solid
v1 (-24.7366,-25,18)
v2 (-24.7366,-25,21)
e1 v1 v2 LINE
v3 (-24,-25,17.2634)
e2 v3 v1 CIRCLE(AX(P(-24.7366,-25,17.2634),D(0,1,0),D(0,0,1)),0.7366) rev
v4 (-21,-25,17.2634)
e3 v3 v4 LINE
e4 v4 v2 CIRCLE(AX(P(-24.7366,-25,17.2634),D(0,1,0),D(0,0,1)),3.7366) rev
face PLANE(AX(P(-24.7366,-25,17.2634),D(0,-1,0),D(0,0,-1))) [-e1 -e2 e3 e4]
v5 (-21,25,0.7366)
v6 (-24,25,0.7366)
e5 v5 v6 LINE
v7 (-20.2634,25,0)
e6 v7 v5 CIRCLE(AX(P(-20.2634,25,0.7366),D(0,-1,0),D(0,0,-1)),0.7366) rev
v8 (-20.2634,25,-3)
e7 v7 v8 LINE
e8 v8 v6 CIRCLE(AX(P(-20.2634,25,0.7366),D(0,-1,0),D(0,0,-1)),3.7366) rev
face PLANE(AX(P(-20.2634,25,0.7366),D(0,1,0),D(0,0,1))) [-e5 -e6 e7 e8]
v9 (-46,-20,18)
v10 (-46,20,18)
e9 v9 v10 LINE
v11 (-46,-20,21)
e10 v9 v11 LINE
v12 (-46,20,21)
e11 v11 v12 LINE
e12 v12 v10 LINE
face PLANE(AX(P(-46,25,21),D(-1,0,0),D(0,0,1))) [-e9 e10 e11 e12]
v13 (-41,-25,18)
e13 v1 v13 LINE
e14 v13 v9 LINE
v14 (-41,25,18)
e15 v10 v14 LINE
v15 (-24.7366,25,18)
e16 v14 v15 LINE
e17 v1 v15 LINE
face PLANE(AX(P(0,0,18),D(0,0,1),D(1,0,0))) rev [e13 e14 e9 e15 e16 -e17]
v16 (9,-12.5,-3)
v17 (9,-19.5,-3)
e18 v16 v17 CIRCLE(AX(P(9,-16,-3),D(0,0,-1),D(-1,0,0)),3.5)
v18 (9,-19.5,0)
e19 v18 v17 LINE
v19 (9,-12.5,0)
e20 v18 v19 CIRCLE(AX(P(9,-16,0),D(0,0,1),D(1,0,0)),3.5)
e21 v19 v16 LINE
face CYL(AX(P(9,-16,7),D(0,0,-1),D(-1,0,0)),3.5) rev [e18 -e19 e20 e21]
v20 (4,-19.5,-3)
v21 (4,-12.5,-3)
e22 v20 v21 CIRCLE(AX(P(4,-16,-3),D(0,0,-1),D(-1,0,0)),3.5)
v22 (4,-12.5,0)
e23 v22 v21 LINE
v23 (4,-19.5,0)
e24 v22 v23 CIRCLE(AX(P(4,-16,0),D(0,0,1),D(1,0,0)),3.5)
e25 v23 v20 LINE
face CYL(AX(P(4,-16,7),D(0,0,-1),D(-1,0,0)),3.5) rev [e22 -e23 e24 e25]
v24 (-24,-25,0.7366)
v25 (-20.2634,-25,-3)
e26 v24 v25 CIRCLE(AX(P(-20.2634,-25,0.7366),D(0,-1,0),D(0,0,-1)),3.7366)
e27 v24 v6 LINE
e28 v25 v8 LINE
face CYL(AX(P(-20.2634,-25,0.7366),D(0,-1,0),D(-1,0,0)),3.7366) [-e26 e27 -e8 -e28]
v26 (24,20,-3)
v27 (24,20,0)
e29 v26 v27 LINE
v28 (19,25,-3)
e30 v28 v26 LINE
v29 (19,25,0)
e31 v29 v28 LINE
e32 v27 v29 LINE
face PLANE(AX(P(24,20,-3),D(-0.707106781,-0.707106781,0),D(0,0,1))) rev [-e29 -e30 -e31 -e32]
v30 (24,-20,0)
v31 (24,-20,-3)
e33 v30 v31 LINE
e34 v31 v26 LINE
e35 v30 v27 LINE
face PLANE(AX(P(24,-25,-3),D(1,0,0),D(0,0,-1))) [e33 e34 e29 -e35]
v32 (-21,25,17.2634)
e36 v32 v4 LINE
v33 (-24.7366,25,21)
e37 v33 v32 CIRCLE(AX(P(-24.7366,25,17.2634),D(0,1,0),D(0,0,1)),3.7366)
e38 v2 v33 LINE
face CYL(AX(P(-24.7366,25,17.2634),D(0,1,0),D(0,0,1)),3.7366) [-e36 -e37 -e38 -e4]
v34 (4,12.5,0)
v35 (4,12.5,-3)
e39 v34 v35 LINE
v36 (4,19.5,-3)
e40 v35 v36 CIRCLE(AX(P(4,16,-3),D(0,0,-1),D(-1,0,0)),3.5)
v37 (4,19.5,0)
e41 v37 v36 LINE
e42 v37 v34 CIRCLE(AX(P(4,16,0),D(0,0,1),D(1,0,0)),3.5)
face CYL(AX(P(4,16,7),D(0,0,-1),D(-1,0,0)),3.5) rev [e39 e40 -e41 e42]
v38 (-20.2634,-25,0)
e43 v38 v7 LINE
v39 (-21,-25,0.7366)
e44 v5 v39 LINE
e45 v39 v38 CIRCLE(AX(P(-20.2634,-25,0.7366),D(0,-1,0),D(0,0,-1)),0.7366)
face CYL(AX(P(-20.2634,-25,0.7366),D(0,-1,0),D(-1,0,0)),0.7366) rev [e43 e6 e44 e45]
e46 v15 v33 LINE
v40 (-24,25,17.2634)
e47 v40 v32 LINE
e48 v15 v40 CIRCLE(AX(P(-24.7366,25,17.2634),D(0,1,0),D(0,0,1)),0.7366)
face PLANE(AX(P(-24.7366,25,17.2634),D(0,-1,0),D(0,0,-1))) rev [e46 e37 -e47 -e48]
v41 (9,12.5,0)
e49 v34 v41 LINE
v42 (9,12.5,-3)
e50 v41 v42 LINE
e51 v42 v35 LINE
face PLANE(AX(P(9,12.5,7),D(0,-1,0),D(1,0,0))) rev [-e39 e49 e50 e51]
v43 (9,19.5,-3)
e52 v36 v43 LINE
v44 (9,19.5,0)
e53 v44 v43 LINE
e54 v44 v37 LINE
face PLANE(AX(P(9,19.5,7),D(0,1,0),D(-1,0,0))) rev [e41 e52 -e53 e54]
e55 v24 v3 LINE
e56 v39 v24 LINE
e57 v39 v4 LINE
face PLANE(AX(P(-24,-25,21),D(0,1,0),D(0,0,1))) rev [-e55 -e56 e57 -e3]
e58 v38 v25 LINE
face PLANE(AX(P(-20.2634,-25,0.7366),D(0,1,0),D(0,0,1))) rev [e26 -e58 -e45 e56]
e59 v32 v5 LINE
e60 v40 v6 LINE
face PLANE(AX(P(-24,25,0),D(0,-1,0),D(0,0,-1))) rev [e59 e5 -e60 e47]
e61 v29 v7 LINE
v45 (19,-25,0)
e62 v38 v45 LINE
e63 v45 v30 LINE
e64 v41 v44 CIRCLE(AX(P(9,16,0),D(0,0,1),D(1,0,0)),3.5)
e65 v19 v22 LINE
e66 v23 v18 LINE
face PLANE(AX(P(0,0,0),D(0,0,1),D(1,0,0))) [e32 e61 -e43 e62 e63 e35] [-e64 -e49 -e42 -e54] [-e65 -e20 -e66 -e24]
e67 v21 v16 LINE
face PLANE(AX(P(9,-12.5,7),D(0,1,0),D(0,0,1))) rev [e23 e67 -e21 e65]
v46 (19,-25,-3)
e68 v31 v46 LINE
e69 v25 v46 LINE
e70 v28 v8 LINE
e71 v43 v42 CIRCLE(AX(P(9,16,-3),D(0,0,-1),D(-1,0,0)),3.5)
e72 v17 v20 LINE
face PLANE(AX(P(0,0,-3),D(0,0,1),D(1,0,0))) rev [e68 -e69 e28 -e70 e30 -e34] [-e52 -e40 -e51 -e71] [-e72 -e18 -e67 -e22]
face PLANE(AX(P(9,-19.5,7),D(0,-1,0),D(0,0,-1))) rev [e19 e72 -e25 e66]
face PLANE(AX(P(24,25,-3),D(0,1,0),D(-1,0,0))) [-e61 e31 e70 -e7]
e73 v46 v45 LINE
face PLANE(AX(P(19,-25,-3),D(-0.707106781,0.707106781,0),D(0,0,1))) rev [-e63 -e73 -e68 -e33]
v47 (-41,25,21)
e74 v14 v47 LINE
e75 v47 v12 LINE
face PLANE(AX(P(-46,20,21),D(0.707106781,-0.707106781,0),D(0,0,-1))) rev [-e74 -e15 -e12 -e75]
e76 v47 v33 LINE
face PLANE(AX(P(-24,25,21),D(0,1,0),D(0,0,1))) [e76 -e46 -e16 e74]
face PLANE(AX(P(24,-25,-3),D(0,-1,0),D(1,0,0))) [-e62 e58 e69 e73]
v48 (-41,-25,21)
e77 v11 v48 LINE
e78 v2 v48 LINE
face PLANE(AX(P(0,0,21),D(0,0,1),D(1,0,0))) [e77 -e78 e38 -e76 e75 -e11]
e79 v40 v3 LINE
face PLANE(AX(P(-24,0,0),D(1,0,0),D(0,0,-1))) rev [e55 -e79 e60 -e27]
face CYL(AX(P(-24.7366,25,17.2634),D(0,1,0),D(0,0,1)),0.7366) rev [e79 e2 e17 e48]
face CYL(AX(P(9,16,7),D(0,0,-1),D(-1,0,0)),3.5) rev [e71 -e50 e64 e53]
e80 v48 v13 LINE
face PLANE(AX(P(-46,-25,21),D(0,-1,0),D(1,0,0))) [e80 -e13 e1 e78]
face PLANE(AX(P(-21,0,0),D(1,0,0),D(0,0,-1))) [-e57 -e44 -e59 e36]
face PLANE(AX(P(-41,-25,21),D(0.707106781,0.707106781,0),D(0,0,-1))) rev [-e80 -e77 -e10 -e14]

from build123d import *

# Parameters (mm, degrees)
SKETCH_1_W                       = 48
SKETCH_1_H                       = 50
SM_BASE_FLANGE_1_DEPTH           = 3
SM_EDGE_FLANGE_1_STRIP_W         = 13.4732
SM_EDGE_FLANGE_1_STRIP_H         = 3
SM_EDGE_FLANGE_1_STRIP_CUT_DEPTH = 50
SM_EDGE_FLANGE_1_DEPTH           = 50
SM_EDGE_FLANGE_2_STRIP_W         = 13.4732
SM_EDGE_FLANGE_2_STRIP_H         = 3
SM_EDGE_FLANGE_2_STRIP_CUT_DEPTH = 50
SM_EDGE_FLANGE_2_DEPTH           = 50
CHAMFER_1_SIZE                   = 5
HOLE_WIZARD_7_0_7_1_D            = 7
CUT_EXTRUDE_1_DEPTH              = 10


# Sheet-metal steps are written as plain solids
with BuildPart() as part:
    # Sketch 1 → 基体-法兰1 (new body)
    with BuildSketch(Plane.XY):
        Rectangle(SKETCH_1_W, SKETCH_1_H)
    extrude(amount=-SM_BASE_FLANGE_1_DEPTH)

    # 边线-法兰1 strip (across the edge) → 边线-法兰1 strip cut (cut)
    with BuildSketch(Plane(origin=(-24, 25, 0), x_dir=(1, 0, 0), z_dir=(0, -1, 0))):
        with Locations((-3, -1.5)):
            Rectangle(SM_EDGE_FLANGE_1_STRIP_W, SM_EDGE_FLANGE_1_STRIP_H)
    extrude(amount=SM_EDGE_FLANGE_1_STRIP_CUT_DEPTH, mode=Mode.SUBTRACT)

    # 边线-法兰1 section (across the edge) → 边线-法兰1 (add)
    with BuildSketch(Plane(origin=(-24, 25, 0), x_dir=(1, 0, 0), z_dir=(0, -1, 0))):
        with BuildLine():
            Line((0, 0.7366), (0, 21))
            Line((0, 21), (3, 21))
            Line((3, 21), (3, 0.7366))
            ThreePointArc((3, 0.7366), (3.215745145, 0.215745145), (3.7366, 0))
            Line((3.7366, 0), (3.7366, -3))
            ThreePointArc((3.7366, -3), (1.094424801, -1.905575199), (0, 0.7366))
        make_face()
    extrude(amount=SM_EDGE_FLANGE_1_DEPTH)

    # 边线-法兰2 strip (across the edge) → 边线-法兰2 strip cut (cut)
    with BuildSketch(Plane(origin=(-24, -25, 21), x_dir=(0, 0, -1), z_dir=(0, 1, 0))):
        with Locations((-3, -1.5)):
            Rectangle(SM_EDGE_FLANGE_2_STRIP_W, SM_EDGE_FLANGE_2_STRIP_H)
    extrude(amount=SM_EDGE_FLANGE_2_STRIP_CUT_DEPTH, mode=Mode.SUBTRACT)

    # 边线-法兰2 section (across the edge) → 边线-法兰2 (add)
    with BuildSketch(Plane(origin=(-24, -25, 21), x_dir=(0, 0, -1), z_dir=(0, 1, 0))):
        with BuildLine():
            Line((0, 0.7366), (0, 22))
            Line((0, 22), (3, 22))
            Line((3, 22), (3, 0.7366))
            ThreePointArc((3, 0.7366), (3.215745145, 0.215745145), (3.7366, 0))
            Line((3.7366, 0), (3.7366, -3))
            ThreePointArc((3.7366, -3), (1.094424801, -1.905575199), (0, 0.7366))
        make_face()
    extrude(amount=SM_EDGE_FLANGE_2_DEPTH)

    # 倒角1
    chamfer_1_edges = [part.edges().sort_by_distance(p)[0] for p in [
        (-46, -25, 19.5),
        (-46, 25, 19.5),
        (24, 25, -1.5),
        (24, -25, -1.5),
    ]]
    chamfer(chamfer_1_edges, length=CHAMFER_1_SIZE)

    # Ø7.0 (7) 直径孔1 (through all)
    with Locations(Plane(origin=(0, 0, -3), x_dir=(-1, 0, 0), z_dir=(0, 0, -1))):
        with Locations((-6.5, 16), (-6.5, -16)):
            Hole(HOLE_WIZARD_7_0_7_1_D / 2)

    # 草图14 → 切除-拉伸1 (cut)
    with BuildSketch(Plane(origin=(0, 0, -3), x_dir=(-1, 0, 0), z_dir=(0, 0, -1))):
        with BuildLine():
            Line((-9, 19.5), (-4, 19.5))
            ThreePointArc((-4, 19.5), (-0.5, 16), (-4, 12.5))
            Line((-4, 12.5), (-9, 12.5))
            ThreePointArc((-9, 12.5), (-12.5, 16), (-9, 19.5))
        make_face()
        with BuildLine():
            Line((-9, -12.5), (-4, -12.5))
            ThreePointArc((-4, -12.5), (-0.5, -16), (-4, -19.5))
            Line((-4, -19.5), (-9, -19.5))
            ThreePointArc((-9, -19.5), (-12.5, -16), (-9, -12.5))
        make_face()
    extrude(amount=-CUT_EXTRUDE_1_DEPTH, mode=Mode.SUBTRACT)


solid = part.part
